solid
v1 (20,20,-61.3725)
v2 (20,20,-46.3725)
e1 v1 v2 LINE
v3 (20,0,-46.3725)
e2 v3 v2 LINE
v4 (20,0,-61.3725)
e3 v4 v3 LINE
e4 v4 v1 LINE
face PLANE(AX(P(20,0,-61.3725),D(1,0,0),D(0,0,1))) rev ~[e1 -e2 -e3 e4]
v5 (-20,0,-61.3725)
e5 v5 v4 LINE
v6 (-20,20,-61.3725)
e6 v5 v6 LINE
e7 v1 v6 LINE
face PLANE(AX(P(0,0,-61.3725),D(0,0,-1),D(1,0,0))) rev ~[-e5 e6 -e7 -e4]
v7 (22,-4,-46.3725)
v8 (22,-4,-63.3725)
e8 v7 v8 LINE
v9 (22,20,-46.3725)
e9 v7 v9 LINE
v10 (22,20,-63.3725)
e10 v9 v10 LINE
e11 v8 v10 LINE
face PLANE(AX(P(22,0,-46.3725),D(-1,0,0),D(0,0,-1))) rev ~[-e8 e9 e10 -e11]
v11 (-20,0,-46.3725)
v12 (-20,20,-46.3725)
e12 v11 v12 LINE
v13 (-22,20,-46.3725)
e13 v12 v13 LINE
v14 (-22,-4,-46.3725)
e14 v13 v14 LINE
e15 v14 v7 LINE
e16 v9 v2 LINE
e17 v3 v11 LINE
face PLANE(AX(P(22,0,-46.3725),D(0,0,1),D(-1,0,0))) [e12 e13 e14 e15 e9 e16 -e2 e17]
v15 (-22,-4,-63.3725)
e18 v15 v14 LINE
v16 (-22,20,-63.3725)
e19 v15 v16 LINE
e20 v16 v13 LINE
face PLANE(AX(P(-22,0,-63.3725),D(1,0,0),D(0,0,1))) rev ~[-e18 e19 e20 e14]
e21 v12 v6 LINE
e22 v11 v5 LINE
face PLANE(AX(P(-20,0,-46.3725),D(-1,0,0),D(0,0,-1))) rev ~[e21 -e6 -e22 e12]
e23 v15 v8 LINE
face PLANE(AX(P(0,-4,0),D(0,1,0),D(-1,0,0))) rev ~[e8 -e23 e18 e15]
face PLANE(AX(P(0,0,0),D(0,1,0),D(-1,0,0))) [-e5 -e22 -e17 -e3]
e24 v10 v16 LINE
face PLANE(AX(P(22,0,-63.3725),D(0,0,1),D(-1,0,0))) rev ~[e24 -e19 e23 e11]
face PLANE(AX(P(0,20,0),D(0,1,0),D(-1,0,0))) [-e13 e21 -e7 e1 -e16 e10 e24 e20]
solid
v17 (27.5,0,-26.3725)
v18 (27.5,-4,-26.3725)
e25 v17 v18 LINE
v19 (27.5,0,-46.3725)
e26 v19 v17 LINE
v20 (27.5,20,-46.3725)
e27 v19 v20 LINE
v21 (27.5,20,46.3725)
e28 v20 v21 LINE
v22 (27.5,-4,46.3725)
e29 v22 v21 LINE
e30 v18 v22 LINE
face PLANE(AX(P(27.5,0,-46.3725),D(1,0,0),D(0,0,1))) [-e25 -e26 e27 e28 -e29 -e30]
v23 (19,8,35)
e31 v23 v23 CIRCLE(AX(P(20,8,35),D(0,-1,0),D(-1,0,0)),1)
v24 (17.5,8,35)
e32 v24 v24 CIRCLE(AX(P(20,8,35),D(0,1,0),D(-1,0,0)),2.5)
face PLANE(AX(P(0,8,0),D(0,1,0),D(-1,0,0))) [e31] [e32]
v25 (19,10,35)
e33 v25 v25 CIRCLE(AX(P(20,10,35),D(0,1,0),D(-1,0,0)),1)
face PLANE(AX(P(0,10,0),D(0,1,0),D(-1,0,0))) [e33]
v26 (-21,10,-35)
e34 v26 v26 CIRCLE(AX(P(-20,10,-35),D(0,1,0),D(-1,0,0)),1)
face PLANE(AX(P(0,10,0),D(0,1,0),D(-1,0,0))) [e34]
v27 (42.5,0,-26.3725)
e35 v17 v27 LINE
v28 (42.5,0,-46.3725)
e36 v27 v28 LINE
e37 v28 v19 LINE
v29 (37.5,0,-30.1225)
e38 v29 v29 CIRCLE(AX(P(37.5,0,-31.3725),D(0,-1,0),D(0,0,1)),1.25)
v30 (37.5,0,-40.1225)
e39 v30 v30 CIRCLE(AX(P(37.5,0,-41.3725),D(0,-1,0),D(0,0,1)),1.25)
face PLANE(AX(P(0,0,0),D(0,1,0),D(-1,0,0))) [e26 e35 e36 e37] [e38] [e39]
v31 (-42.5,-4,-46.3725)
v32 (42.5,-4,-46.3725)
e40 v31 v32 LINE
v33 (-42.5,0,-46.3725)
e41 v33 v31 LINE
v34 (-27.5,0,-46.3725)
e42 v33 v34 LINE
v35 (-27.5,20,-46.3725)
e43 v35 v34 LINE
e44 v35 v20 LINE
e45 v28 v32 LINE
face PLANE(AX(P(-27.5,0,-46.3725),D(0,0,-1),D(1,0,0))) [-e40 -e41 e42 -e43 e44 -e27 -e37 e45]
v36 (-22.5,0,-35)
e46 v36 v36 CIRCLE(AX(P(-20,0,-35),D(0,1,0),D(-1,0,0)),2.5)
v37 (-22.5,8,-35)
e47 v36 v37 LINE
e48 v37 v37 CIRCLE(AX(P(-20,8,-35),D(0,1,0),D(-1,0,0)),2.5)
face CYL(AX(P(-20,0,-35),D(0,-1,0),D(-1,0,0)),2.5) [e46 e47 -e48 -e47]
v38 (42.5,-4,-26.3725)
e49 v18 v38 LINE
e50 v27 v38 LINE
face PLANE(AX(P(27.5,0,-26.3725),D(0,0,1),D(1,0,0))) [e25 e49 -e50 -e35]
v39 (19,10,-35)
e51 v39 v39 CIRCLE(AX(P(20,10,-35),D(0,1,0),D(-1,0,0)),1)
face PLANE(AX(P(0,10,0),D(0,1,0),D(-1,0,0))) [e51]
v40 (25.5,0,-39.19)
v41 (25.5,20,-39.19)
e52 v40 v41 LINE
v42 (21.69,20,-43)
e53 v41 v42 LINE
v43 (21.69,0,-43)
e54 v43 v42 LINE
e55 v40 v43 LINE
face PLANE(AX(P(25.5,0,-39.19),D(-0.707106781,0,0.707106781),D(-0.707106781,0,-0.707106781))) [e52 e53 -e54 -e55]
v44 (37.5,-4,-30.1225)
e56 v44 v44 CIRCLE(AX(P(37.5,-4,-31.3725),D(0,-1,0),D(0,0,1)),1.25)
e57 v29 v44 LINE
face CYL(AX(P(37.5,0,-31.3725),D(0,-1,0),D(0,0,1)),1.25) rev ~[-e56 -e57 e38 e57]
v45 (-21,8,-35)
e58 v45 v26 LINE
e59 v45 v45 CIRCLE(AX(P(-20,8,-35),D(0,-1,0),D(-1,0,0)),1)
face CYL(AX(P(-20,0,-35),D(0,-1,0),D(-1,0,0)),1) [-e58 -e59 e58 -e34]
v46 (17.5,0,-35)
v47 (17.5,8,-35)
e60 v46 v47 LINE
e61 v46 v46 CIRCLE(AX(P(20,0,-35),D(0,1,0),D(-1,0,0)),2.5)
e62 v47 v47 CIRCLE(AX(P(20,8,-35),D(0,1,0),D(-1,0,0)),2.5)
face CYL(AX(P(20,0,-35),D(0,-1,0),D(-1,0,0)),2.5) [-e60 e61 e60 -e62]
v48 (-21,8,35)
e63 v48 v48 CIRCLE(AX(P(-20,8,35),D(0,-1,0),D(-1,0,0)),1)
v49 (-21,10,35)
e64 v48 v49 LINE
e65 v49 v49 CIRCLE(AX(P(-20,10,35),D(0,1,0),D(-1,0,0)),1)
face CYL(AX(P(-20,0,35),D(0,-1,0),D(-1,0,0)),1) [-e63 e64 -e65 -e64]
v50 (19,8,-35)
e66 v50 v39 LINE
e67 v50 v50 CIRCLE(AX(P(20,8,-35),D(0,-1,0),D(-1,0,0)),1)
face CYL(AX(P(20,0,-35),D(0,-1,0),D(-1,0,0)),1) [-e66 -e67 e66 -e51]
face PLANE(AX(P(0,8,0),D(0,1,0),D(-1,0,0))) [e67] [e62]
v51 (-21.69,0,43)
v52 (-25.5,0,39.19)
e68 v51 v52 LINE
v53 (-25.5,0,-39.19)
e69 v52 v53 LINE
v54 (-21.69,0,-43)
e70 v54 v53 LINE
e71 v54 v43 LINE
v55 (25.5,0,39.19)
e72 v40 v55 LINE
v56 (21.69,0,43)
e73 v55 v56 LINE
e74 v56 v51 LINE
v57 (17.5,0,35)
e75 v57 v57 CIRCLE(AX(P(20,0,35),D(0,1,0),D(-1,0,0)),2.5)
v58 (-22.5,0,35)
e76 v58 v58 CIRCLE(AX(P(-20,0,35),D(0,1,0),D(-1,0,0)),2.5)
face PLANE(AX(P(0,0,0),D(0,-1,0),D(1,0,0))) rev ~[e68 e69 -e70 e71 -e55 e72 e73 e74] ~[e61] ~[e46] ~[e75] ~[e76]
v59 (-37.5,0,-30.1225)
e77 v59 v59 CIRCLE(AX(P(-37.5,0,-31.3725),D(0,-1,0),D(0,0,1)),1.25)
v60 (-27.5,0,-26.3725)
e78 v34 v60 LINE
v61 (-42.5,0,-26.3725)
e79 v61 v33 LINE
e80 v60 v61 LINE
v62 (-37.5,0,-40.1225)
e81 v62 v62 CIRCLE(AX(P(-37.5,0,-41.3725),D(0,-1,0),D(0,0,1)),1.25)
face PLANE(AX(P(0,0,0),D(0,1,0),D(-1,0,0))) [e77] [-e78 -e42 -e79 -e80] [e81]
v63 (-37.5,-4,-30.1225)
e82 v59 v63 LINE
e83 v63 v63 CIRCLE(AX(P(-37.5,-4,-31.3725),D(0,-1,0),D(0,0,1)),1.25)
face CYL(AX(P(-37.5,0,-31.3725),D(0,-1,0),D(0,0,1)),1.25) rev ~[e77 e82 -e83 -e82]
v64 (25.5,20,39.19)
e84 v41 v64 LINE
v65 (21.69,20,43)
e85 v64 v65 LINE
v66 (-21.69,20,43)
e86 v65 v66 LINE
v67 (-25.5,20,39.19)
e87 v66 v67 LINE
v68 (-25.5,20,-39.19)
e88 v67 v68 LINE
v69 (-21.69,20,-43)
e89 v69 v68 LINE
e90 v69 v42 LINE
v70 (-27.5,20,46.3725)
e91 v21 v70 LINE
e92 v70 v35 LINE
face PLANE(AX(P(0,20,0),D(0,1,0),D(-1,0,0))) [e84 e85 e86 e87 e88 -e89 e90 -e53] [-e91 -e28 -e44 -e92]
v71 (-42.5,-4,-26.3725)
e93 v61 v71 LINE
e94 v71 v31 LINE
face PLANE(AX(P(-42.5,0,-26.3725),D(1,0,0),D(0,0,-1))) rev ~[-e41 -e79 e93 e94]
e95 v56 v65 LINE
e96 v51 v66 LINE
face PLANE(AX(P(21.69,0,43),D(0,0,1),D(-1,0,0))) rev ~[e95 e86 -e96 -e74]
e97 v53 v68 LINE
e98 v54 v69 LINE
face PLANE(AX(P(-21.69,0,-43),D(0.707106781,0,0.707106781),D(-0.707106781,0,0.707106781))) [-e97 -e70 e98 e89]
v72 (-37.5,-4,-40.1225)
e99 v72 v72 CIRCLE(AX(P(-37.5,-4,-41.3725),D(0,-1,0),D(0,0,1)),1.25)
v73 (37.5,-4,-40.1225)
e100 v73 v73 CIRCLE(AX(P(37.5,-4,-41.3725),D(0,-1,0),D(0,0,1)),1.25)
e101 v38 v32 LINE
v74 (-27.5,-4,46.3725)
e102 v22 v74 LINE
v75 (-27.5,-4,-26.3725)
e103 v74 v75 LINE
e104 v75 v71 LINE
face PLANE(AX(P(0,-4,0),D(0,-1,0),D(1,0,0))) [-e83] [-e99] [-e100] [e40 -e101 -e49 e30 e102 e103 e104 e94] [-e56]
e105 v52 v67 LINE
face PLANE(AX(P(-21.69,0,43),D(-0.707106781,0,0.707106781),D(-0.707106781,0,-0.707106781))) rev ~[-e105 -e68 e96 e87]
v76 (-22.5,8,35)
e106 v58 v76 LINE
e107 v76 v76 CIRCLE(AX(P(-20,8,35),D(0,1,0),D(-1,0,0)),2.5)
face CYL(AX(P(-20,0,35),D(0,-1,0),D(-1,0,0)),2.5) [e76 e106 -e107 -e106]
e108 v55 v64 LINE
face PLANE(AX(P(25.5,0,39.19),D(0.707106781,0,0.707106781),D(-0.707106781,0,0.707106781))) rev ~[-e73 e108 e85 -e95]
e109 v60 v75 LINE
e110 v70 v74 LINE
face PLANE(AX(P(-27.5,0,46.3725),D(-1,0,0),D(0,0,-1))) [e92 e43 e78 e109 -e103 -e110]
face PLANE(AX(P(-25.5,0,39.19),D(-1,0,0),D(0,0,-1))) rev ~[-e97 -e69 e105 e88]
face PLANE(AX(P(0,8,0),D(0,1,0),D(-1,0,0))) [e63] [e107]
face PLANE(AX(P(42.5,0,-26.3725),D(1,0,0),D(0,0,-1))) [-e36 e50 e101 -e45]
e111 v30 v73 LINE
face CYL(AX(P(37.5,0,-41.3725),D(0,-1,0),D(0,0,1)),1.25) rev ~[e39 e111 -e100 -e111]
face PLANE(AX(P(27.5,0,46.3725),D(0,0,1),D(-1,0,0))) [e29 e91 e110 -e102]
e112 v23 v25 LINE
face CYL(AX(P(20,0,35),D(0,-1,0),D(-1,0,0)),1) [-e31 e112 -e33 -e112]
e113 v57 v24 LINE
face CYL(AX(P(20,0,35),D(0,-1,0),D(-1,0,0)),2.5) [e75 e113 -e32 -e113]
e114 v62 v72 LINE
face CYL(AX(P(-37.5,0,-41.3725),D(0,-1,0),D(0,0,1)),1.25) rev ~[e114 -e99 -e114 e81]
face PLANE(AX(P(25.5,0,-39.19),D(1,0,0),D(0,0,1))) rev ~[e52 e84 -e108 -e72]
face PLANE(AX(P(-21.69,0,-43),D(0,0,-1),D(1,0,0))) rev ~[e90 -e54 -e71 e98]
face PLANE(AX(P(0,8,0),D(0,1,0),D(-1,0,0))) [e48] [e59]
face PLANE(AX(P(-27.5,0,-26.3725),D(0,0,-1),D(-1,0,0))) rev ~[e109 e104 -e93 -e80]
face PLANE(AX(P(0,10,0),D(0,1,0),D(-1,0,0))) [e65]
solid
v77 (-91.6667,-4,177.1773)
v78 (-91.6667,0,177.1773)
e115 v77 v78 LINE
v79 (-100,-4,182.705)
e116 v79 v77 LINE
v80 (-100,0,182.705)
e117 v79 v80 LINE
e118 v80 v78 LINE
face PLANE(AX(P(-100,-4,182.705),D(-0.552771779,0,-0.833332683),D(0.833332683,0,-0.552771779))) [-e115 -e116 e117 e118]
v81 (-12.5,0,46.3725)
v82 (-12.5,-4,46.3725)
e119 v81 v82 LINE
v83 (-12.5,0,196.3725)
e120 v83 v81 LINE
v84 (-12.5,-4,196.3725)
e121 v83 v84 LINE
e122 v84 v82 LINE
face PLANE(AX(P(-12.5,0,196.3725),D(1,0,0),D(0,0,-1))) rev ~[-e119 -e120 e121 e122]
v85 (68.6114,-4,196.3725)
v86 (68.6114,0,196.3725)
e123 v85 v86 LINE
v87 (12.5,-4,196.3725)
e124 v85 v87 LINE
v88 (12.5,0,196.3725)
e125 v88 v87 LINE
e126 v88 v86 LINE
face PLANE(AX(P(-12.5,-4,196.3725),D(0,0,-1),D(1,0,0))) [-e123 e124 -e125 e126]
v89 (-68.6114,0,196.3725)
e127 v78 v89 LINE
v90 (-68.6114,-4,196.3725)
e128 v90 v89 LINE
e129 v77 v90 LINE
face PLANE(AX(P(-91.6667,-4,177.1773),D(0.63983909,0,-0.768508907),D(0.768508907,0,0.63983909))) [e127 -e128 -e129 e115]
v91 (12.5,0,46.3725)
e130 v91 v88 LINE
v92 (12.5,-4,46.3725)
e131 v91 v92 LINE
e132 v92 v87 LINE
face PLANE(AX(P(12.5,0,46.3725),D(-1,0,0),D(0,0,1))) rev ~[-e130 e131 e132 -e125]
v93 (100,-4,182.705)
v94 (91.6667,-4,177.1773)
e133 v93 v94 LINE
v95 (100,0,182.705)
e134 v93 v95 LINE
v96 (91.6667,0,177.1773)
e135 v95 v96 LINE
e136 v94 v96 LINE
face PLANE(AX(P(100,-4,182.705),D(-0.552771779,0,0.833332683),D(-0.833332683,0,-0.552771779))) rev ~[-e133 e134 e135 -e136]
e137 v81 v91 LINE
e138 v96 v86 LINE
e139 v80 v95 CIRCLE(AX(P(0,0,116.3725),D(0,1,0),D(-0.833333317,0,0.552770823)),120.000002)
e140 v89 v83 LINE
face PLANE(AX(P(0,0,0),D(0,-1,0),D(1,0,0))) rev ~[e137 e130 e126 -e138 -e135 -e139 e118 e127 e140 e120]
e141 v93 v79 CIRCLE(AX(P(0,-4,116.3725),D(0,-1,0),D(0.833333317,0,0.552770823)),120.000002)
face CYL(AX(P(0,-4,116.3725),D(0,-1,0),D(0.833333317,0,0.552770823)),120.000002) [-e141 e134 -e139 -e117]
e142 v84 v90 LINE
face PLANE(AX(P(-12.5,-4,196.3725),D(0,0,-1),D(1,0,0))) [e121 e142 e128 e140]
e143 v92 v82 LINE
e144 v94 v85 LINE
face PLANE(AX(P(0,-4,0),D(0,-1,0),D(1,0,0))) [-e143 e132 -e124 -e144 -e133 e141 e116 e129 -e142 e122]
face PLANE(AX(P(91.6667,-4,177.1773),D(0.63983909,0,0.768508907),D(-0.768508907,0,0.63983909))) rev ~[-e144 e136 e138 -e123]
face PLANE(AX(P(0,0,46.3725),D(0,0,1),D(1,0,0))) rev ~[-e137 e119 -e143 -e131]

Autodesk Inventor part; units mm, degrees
ref_plane "YZ Plane" through (0, 0, 0) normal (1, 0, 0) x (0, 1, 0)
ref_plane "XZ Plane" through (0, 0, 0) normal (0, 1, 0) x (-1, 0, 0)
ref_plane "XY Plane" through (0, 0, 0) normal (0, 0, 1) x (1, 0, 0)
sketch "Sketch1" plane through (0, 0, 0) normal (0, 1, 0) x (-1, 0, 0)
  line L0 (-21.69, 43) -> (21.69, 43)
  line L1 (25.5, 39.19) -> (25.5, -39.19)
  line L2 (21.69, -43) -> (-21.69, -43)
  line L3 (-25.5, -39.19) -> (-25.5, 39.19)
  line L4 (-25.5, 43) -> (25.5, -43) construction
  line L5 (25.5, 43) -> (-25.5, -43) construction
  line L6 (-25.5, 39.19) -> (-21.69, 43)
  line L7 (21.69, 43) -> (25.5, 39.19)
  line L8 (21.69, -43) -> (25.5, -39.19)
  line L9 (-25.5, -39.19) -> (-21.69, -43)
  line L10 (-27.5, 46.3725) -> (27.5, 46.3725)
  line L11 (27.5, 46.3725) -> (27.5, -46.3725)
  line L12 (27.5, -46.3725) -> (-27.5, -46.3725)
  line L13 (-27.5, -46.3725) -> (-27.5, 46.3725)
  line L14 (-27.5, 46.3725) -> (27.5, -46.3725) construction
  line L15 (27.5, 46.3725) -> (-27.5, -46.3725) construction
  point P0 (0, 0)
  dimension "d0" = 86
  dimension "d1" = 51
  dimension "d2" = 3.81
  dimension "d3" = 3.81
  dimension "d4" = 3.81
  dimension "d5" = 3.81
  dimension "d6" = 3.81
  dimension "d7" = 3.81
  dimension "d8" = 3.81
  dimension "d9" = 3.81
  dimension "d10" = 2
extrude "Extrusion1" add sketch "Sketch1" along normal blind 20
sketch "Sketch2" plane through (0, 0, 0) normal (0, 1, 0) x (-1, 0, 0)
  circle A0 centre (20, 35) radius 2.5
  line L0 (0, -52.5) -> (0, 52.5) projected
  line L1 (31.5, 0) -> (-31.5, 0) projected
  circle A1 centre (20, 35) radius 1
  circle A2 centre (20, -35) radius 2.5
  circle A3 centre (20, -35) radius 1
  circle A4 centre (-20, 35) radius 2.5
  circle A5 centre (-20, 35) radius 1
  circle A6 centre (-20, -35) radius 2.5
  circle A7 centre (-20, -35) radius 1
  point P0 (0, 0)
  dimension "d13" = 5
  dimension "d14" = 2
  dimension "d15" = 40
  dimension "d16" = 70
extrude "Extrusion2" add sketch "Sketch2" along normal blind 8 contours A0 | A1 | A2 | A3 | A4 | A5 | A6 | A7
extrude "Extrusion3" add sketch "Sketch2" along normal blind 10 contours A1 | A3 | A5 | A7
sketch "Sketch3" plane through (0, 0, 0) normal (0, -1, 0) x (1, 0, 0)
  line L0 (-21.69, 43) -> (21.69, 43) projected
  line L1 (21.69, 43) -> (25.5, 39.19) projected
  line L2 (25.5, 39.19) -> (25.5, -39.19) projected
  line L3 (25.5, -39.19) -> (21.69, -43) projected
  line L4 (21.69, -43) -> (-21.69, -43) projected
  line L5 (-21.69, -43) -> (-25.5, -39.19) projected
  line L6 (-25.5, -39.19) -> (-25.5, 39.19) projected
  line L7 (-25.5, 39.19) -> (-21.69, 43) projected
  line L8 (27.5, 46.3725) -> (-27.5, 46.3725) projected
  line L9 (-27.5, 46.3725) -> (-27.5, -46.3725) projected
  line L10 (-27.5, -46.3725) -> (27.5, -46.3725) projected
  line L11 (27.5, -46.3725) -> (27.5, 46.3725) projected
  point P0 (0, 0)
extrude "Extrusion4" add sketch "Sketch3" along normal blind 4 contours L0 L1 L2 L3 L4 L5 L6 L7 | L11 L10 L9 L8
sketch "Sketch4" plane through (0, 0, 0) normal (0, 1, 0) x (-1, 0, 0)
  line L0 (0, -39.2745) -> (0, 235.6471) projected
  line L1 (-12.5, 196.3725) -> (12.5, 196.3725)
  line L2 (12.5, 196.3725) -> (12.5, 46.3725)
  line L3 (12.5, 46.3725) -> (-12.5, 46.3725)
  line L4 (-12.5, 46.3725) -> (-12.5, 196.3725)
  line L5 (-12.5, 196.3725) -> (12.5, 46.3725) construction
  line L6 (12.5, 196.3725) -> (-12.5, 46.3725) construction
  line L7 (27.5, 46.3725) -> (-27.5, 46.3725) projected
  point P0 (0, 0)
  point P1 (0, 121.3725)
  dimension "d23" = 25
  dimension "d24" = 150
extrude "Extrusion5" add sketch "Sketch4" against normal blind 4 separate body
sketch "Sketch5" plane through (0, -4, 0) normal (0, -1, 0) x (1, 0, 0)
  line L0 (0, -102.9216) -> (0, 292.9216) projected
  arc A0 (100, 182.705) -> (-100, 182.705) centre (0, 116.3725) ccw
  line L1 (100, 182.705) -> (91.6667, 177.1773)
  line L2 (91.6667, 177.1773) -> (68.6114, 196.3725)
  line L3 (68.6114, 196.3725) -> (0, 196.3725)
  line L4 (-100, 182.705) -> (-91.6667, 177.1773)
  line L5 (-91.6667, 177.1773) -> (-68.6114, 196.3725)
  line L6 (-68.6114, 196.3725) -> (0, 196.3725)
  line L7 (12.5, 196.3725) -> (-12.5, 196.3725) projected
  point P0 (0, 0)
  dimension "d29" = 120
  dimension "d31" = 100
  dimension "d32" = 100
  dimension "d33" = 10
  dimension "d34" = 80
  dimension "d35" = 30
extrude "Extrusion6" add sketch "Sketch5" against normal blind 4 bodies 2
sketch "Sketch6" plane through (0, 0, 0) normal (0, 1, 0) x (-1, 0, 0)
  line L0 (-20, -46.3725) -> (20, -46.3725)
  line L1 (20, -46.3725) -> (20, -61.3725)
  line L2 (20, -61.3725) -> (-20, -61.3725)
  line L3 (-20, -61.3725) -> (-20, -46.3725)
  line L4 (-20, -46.3725) -> (20, -61.3725) construction
  line L5 (20, -46.3725) -> (-20, -61.3725) construction
  line L6 (-27.5, -46.3725) -> (27.5, -46.3725) projected
  line L7 (-22, -63.3725) -> (22, -63.3725)
  line L8 (22, -63.3725) -> (22, -46.3725)
  line L9 (22, -46.3725) -> (-22, -46.3725)
  line L10 (-22, -46.3725) -> (-22, -63.3725)
  line L11 (-22, -63.3725) -> (22, -46.3725) construction
  line L12 (22, -63.3725) -> (-22, -46.3725) construction
  line L13 (0, -76.0471) -> (0, 12.6745) projected
  point P0 (0, 0)
  point P1 (0, -53.8725)
  point P2 (0, -54.8725)
  point P3 (0, -54.8725)
  point P4 (0, -53.8725)
  dimension "d38" = 40
  dimension "d39" = 15
  dimension "d40" = 2
  dimension "d41" = 2
extrude "Extrusion7" add sketch "Sketch6" along normal blind 20 separate body contours L3 L2 L13 L7 L10 L6 | L6 L8 L7 L13 L2 L1
extrude "Extrusion8" add sketch "Sketch6" against normal blind 4 bodies 3
sketch "Sketch7" plane through (0, 0, 0) normal (0, 1, 0) x (-1, 0, 0)
  line L0 (-27.5, -26.3725) -> (-42.5, -26.3725)
  line L1 (-42.5, -26.3725) -> (-42.5, -46.3725)
  line L2 (-42.5, -46.3725) -> (-27.5, -46.3725)
  line L3 (-27.5, -46.3725) -> (-27.5, -26.3725)
  line L4 (-27.5, -26.3725) -> (-42.5, -46.3725) construction
  line L5 (-42.5, -26.3725) -> (-27.5, -46.3725) construction
  line L6 (-27.5, 46.3725) -> (-27.5, -46.3725) projected
  line L7 (-27.5, -46.3725) -> (27.5, -46.3725) projected
  line L8 (0, -123.3216) -> (0, 296.3216) projected
  line L9 (27.5, -26.3725) -> (42.5, -26.3725)
  line L10 (42.5, -26.3725) -> (42.5, -46.3725)
  line L11 (42.5, -46.3725) -> (27.5, -46.3725)
  line L12 (27.5, -46.3725) -> (27.5, -26.3725)
  point P0 (0, 0)
  point P1 (-35, -36.3725)
  dimension "d46" = 20
  dimension "d47" = 15
extrude "Extrusion9" add sketch "Sketch7" against normal blind 4 bodies 1
sketch "Sketch8" plane through (0, 0, 0) normal (0, 1, 0) x (1, 0, 0)
  line L0 (-55.7062, 36.3725) -> (-34.5441, 36.3725) construction
  line L1 (-42.5, 46.3725) -> (-27.5, 46.3725) projected
  line L2 (-42.5, 26.3725) -> (-42.5, 46.3725) projected
  line L3 (0, 123.3216) -> (0, -296.3216) projected
  point P0 (0, 0)
  point P1 (-37.5, 31.3725)
  point P2 (-37.5, 41.3725)
  point P3 (37.5, 31.3725)
  point P4 (37.5, 41.3725)
  dimension "d50" = 10
  dimension "d51" = 10
  dimension "d52" = 5
hole "Hole1" at (-37.5, 0, -31.3725) at (-37.5, 0, -41.3725) at (37.5, 0, -31.3725) at (37.5, 0, -41.3725) direction (0, -1, 0) diameter 2.5 end through all bodies 1
equation "\"d2\" = Chamfer_PCB"
equation "\"d3\" = d2"
equation "\"d4\" = Chamfer_PCB"
equation "\"d5\" = d4"
equation "\"d6\" = Chamfer_PCB"
equation "\"d7\" = d6"
equation "\"d8\" = Chamfer_PCB"
equation "\"d9\" = d8"
equation "\"d11\" = 2 * HU_PCB"
equation "\"d15\" = DIH_PCB"
equation "\"d16\" = DOH_PCB"
equation "\"d19\" = HU_PCB"
equation "\"d21\" = H_Wall"
equation "\"d23\" = 0.5 * W_PCB"
equation "\"d24\" = L_PCBToSensor"
equation "\"d25\" = H_Wall"
equation "\"d31\" = 0.5 * W_MaxWidth"
equation "\"d32\" = d31"
equation "\"d36\" = H_Wall"
equation "\"d38\" = L_LiPo_245mAh"
equation "\"d39\" = H_LiPo_245mAh"
equation "\"d40\" = 0.5 * H_Wall"
equation "\"d41\" = d40"
equation "\"d42\" = W_LiPo_245mAh"
equation "\"d44\" = H_Wall"
equation "\"d46\" = 2 * DSH_Motor"
equation "\"d48\" = H_Wall"
equation "\"d50\" = DSH_Motor"
equation "\"d51\" = DSH_Motor"
equation "\"d52\" = 0.5 * DSH_Motor"
equation "\"HU_PCB\" = 10"
equation "\"L_PCB\" = 85"
equation "\"DIH_PCB\" = 40"
equation "\"DOH_PCB\" = 70"
equation "\"Chamfer_PCB\" = 3.81"
equation "\"L_PCBToSensor\" = 150"
equation "\"H_Wall\" = 4"
equation "\"W_LiPo_245mAh\" = 20"
equation "\"H_LiPo_245mAh\" = 15"
equation "\"L_LiPo_245mAh\" = 40"
equation "\"DSH_Motor\" = 10"
equation "\"W_PCB\" = 50"
equation "\"W_MaxWidth\" = 200"
